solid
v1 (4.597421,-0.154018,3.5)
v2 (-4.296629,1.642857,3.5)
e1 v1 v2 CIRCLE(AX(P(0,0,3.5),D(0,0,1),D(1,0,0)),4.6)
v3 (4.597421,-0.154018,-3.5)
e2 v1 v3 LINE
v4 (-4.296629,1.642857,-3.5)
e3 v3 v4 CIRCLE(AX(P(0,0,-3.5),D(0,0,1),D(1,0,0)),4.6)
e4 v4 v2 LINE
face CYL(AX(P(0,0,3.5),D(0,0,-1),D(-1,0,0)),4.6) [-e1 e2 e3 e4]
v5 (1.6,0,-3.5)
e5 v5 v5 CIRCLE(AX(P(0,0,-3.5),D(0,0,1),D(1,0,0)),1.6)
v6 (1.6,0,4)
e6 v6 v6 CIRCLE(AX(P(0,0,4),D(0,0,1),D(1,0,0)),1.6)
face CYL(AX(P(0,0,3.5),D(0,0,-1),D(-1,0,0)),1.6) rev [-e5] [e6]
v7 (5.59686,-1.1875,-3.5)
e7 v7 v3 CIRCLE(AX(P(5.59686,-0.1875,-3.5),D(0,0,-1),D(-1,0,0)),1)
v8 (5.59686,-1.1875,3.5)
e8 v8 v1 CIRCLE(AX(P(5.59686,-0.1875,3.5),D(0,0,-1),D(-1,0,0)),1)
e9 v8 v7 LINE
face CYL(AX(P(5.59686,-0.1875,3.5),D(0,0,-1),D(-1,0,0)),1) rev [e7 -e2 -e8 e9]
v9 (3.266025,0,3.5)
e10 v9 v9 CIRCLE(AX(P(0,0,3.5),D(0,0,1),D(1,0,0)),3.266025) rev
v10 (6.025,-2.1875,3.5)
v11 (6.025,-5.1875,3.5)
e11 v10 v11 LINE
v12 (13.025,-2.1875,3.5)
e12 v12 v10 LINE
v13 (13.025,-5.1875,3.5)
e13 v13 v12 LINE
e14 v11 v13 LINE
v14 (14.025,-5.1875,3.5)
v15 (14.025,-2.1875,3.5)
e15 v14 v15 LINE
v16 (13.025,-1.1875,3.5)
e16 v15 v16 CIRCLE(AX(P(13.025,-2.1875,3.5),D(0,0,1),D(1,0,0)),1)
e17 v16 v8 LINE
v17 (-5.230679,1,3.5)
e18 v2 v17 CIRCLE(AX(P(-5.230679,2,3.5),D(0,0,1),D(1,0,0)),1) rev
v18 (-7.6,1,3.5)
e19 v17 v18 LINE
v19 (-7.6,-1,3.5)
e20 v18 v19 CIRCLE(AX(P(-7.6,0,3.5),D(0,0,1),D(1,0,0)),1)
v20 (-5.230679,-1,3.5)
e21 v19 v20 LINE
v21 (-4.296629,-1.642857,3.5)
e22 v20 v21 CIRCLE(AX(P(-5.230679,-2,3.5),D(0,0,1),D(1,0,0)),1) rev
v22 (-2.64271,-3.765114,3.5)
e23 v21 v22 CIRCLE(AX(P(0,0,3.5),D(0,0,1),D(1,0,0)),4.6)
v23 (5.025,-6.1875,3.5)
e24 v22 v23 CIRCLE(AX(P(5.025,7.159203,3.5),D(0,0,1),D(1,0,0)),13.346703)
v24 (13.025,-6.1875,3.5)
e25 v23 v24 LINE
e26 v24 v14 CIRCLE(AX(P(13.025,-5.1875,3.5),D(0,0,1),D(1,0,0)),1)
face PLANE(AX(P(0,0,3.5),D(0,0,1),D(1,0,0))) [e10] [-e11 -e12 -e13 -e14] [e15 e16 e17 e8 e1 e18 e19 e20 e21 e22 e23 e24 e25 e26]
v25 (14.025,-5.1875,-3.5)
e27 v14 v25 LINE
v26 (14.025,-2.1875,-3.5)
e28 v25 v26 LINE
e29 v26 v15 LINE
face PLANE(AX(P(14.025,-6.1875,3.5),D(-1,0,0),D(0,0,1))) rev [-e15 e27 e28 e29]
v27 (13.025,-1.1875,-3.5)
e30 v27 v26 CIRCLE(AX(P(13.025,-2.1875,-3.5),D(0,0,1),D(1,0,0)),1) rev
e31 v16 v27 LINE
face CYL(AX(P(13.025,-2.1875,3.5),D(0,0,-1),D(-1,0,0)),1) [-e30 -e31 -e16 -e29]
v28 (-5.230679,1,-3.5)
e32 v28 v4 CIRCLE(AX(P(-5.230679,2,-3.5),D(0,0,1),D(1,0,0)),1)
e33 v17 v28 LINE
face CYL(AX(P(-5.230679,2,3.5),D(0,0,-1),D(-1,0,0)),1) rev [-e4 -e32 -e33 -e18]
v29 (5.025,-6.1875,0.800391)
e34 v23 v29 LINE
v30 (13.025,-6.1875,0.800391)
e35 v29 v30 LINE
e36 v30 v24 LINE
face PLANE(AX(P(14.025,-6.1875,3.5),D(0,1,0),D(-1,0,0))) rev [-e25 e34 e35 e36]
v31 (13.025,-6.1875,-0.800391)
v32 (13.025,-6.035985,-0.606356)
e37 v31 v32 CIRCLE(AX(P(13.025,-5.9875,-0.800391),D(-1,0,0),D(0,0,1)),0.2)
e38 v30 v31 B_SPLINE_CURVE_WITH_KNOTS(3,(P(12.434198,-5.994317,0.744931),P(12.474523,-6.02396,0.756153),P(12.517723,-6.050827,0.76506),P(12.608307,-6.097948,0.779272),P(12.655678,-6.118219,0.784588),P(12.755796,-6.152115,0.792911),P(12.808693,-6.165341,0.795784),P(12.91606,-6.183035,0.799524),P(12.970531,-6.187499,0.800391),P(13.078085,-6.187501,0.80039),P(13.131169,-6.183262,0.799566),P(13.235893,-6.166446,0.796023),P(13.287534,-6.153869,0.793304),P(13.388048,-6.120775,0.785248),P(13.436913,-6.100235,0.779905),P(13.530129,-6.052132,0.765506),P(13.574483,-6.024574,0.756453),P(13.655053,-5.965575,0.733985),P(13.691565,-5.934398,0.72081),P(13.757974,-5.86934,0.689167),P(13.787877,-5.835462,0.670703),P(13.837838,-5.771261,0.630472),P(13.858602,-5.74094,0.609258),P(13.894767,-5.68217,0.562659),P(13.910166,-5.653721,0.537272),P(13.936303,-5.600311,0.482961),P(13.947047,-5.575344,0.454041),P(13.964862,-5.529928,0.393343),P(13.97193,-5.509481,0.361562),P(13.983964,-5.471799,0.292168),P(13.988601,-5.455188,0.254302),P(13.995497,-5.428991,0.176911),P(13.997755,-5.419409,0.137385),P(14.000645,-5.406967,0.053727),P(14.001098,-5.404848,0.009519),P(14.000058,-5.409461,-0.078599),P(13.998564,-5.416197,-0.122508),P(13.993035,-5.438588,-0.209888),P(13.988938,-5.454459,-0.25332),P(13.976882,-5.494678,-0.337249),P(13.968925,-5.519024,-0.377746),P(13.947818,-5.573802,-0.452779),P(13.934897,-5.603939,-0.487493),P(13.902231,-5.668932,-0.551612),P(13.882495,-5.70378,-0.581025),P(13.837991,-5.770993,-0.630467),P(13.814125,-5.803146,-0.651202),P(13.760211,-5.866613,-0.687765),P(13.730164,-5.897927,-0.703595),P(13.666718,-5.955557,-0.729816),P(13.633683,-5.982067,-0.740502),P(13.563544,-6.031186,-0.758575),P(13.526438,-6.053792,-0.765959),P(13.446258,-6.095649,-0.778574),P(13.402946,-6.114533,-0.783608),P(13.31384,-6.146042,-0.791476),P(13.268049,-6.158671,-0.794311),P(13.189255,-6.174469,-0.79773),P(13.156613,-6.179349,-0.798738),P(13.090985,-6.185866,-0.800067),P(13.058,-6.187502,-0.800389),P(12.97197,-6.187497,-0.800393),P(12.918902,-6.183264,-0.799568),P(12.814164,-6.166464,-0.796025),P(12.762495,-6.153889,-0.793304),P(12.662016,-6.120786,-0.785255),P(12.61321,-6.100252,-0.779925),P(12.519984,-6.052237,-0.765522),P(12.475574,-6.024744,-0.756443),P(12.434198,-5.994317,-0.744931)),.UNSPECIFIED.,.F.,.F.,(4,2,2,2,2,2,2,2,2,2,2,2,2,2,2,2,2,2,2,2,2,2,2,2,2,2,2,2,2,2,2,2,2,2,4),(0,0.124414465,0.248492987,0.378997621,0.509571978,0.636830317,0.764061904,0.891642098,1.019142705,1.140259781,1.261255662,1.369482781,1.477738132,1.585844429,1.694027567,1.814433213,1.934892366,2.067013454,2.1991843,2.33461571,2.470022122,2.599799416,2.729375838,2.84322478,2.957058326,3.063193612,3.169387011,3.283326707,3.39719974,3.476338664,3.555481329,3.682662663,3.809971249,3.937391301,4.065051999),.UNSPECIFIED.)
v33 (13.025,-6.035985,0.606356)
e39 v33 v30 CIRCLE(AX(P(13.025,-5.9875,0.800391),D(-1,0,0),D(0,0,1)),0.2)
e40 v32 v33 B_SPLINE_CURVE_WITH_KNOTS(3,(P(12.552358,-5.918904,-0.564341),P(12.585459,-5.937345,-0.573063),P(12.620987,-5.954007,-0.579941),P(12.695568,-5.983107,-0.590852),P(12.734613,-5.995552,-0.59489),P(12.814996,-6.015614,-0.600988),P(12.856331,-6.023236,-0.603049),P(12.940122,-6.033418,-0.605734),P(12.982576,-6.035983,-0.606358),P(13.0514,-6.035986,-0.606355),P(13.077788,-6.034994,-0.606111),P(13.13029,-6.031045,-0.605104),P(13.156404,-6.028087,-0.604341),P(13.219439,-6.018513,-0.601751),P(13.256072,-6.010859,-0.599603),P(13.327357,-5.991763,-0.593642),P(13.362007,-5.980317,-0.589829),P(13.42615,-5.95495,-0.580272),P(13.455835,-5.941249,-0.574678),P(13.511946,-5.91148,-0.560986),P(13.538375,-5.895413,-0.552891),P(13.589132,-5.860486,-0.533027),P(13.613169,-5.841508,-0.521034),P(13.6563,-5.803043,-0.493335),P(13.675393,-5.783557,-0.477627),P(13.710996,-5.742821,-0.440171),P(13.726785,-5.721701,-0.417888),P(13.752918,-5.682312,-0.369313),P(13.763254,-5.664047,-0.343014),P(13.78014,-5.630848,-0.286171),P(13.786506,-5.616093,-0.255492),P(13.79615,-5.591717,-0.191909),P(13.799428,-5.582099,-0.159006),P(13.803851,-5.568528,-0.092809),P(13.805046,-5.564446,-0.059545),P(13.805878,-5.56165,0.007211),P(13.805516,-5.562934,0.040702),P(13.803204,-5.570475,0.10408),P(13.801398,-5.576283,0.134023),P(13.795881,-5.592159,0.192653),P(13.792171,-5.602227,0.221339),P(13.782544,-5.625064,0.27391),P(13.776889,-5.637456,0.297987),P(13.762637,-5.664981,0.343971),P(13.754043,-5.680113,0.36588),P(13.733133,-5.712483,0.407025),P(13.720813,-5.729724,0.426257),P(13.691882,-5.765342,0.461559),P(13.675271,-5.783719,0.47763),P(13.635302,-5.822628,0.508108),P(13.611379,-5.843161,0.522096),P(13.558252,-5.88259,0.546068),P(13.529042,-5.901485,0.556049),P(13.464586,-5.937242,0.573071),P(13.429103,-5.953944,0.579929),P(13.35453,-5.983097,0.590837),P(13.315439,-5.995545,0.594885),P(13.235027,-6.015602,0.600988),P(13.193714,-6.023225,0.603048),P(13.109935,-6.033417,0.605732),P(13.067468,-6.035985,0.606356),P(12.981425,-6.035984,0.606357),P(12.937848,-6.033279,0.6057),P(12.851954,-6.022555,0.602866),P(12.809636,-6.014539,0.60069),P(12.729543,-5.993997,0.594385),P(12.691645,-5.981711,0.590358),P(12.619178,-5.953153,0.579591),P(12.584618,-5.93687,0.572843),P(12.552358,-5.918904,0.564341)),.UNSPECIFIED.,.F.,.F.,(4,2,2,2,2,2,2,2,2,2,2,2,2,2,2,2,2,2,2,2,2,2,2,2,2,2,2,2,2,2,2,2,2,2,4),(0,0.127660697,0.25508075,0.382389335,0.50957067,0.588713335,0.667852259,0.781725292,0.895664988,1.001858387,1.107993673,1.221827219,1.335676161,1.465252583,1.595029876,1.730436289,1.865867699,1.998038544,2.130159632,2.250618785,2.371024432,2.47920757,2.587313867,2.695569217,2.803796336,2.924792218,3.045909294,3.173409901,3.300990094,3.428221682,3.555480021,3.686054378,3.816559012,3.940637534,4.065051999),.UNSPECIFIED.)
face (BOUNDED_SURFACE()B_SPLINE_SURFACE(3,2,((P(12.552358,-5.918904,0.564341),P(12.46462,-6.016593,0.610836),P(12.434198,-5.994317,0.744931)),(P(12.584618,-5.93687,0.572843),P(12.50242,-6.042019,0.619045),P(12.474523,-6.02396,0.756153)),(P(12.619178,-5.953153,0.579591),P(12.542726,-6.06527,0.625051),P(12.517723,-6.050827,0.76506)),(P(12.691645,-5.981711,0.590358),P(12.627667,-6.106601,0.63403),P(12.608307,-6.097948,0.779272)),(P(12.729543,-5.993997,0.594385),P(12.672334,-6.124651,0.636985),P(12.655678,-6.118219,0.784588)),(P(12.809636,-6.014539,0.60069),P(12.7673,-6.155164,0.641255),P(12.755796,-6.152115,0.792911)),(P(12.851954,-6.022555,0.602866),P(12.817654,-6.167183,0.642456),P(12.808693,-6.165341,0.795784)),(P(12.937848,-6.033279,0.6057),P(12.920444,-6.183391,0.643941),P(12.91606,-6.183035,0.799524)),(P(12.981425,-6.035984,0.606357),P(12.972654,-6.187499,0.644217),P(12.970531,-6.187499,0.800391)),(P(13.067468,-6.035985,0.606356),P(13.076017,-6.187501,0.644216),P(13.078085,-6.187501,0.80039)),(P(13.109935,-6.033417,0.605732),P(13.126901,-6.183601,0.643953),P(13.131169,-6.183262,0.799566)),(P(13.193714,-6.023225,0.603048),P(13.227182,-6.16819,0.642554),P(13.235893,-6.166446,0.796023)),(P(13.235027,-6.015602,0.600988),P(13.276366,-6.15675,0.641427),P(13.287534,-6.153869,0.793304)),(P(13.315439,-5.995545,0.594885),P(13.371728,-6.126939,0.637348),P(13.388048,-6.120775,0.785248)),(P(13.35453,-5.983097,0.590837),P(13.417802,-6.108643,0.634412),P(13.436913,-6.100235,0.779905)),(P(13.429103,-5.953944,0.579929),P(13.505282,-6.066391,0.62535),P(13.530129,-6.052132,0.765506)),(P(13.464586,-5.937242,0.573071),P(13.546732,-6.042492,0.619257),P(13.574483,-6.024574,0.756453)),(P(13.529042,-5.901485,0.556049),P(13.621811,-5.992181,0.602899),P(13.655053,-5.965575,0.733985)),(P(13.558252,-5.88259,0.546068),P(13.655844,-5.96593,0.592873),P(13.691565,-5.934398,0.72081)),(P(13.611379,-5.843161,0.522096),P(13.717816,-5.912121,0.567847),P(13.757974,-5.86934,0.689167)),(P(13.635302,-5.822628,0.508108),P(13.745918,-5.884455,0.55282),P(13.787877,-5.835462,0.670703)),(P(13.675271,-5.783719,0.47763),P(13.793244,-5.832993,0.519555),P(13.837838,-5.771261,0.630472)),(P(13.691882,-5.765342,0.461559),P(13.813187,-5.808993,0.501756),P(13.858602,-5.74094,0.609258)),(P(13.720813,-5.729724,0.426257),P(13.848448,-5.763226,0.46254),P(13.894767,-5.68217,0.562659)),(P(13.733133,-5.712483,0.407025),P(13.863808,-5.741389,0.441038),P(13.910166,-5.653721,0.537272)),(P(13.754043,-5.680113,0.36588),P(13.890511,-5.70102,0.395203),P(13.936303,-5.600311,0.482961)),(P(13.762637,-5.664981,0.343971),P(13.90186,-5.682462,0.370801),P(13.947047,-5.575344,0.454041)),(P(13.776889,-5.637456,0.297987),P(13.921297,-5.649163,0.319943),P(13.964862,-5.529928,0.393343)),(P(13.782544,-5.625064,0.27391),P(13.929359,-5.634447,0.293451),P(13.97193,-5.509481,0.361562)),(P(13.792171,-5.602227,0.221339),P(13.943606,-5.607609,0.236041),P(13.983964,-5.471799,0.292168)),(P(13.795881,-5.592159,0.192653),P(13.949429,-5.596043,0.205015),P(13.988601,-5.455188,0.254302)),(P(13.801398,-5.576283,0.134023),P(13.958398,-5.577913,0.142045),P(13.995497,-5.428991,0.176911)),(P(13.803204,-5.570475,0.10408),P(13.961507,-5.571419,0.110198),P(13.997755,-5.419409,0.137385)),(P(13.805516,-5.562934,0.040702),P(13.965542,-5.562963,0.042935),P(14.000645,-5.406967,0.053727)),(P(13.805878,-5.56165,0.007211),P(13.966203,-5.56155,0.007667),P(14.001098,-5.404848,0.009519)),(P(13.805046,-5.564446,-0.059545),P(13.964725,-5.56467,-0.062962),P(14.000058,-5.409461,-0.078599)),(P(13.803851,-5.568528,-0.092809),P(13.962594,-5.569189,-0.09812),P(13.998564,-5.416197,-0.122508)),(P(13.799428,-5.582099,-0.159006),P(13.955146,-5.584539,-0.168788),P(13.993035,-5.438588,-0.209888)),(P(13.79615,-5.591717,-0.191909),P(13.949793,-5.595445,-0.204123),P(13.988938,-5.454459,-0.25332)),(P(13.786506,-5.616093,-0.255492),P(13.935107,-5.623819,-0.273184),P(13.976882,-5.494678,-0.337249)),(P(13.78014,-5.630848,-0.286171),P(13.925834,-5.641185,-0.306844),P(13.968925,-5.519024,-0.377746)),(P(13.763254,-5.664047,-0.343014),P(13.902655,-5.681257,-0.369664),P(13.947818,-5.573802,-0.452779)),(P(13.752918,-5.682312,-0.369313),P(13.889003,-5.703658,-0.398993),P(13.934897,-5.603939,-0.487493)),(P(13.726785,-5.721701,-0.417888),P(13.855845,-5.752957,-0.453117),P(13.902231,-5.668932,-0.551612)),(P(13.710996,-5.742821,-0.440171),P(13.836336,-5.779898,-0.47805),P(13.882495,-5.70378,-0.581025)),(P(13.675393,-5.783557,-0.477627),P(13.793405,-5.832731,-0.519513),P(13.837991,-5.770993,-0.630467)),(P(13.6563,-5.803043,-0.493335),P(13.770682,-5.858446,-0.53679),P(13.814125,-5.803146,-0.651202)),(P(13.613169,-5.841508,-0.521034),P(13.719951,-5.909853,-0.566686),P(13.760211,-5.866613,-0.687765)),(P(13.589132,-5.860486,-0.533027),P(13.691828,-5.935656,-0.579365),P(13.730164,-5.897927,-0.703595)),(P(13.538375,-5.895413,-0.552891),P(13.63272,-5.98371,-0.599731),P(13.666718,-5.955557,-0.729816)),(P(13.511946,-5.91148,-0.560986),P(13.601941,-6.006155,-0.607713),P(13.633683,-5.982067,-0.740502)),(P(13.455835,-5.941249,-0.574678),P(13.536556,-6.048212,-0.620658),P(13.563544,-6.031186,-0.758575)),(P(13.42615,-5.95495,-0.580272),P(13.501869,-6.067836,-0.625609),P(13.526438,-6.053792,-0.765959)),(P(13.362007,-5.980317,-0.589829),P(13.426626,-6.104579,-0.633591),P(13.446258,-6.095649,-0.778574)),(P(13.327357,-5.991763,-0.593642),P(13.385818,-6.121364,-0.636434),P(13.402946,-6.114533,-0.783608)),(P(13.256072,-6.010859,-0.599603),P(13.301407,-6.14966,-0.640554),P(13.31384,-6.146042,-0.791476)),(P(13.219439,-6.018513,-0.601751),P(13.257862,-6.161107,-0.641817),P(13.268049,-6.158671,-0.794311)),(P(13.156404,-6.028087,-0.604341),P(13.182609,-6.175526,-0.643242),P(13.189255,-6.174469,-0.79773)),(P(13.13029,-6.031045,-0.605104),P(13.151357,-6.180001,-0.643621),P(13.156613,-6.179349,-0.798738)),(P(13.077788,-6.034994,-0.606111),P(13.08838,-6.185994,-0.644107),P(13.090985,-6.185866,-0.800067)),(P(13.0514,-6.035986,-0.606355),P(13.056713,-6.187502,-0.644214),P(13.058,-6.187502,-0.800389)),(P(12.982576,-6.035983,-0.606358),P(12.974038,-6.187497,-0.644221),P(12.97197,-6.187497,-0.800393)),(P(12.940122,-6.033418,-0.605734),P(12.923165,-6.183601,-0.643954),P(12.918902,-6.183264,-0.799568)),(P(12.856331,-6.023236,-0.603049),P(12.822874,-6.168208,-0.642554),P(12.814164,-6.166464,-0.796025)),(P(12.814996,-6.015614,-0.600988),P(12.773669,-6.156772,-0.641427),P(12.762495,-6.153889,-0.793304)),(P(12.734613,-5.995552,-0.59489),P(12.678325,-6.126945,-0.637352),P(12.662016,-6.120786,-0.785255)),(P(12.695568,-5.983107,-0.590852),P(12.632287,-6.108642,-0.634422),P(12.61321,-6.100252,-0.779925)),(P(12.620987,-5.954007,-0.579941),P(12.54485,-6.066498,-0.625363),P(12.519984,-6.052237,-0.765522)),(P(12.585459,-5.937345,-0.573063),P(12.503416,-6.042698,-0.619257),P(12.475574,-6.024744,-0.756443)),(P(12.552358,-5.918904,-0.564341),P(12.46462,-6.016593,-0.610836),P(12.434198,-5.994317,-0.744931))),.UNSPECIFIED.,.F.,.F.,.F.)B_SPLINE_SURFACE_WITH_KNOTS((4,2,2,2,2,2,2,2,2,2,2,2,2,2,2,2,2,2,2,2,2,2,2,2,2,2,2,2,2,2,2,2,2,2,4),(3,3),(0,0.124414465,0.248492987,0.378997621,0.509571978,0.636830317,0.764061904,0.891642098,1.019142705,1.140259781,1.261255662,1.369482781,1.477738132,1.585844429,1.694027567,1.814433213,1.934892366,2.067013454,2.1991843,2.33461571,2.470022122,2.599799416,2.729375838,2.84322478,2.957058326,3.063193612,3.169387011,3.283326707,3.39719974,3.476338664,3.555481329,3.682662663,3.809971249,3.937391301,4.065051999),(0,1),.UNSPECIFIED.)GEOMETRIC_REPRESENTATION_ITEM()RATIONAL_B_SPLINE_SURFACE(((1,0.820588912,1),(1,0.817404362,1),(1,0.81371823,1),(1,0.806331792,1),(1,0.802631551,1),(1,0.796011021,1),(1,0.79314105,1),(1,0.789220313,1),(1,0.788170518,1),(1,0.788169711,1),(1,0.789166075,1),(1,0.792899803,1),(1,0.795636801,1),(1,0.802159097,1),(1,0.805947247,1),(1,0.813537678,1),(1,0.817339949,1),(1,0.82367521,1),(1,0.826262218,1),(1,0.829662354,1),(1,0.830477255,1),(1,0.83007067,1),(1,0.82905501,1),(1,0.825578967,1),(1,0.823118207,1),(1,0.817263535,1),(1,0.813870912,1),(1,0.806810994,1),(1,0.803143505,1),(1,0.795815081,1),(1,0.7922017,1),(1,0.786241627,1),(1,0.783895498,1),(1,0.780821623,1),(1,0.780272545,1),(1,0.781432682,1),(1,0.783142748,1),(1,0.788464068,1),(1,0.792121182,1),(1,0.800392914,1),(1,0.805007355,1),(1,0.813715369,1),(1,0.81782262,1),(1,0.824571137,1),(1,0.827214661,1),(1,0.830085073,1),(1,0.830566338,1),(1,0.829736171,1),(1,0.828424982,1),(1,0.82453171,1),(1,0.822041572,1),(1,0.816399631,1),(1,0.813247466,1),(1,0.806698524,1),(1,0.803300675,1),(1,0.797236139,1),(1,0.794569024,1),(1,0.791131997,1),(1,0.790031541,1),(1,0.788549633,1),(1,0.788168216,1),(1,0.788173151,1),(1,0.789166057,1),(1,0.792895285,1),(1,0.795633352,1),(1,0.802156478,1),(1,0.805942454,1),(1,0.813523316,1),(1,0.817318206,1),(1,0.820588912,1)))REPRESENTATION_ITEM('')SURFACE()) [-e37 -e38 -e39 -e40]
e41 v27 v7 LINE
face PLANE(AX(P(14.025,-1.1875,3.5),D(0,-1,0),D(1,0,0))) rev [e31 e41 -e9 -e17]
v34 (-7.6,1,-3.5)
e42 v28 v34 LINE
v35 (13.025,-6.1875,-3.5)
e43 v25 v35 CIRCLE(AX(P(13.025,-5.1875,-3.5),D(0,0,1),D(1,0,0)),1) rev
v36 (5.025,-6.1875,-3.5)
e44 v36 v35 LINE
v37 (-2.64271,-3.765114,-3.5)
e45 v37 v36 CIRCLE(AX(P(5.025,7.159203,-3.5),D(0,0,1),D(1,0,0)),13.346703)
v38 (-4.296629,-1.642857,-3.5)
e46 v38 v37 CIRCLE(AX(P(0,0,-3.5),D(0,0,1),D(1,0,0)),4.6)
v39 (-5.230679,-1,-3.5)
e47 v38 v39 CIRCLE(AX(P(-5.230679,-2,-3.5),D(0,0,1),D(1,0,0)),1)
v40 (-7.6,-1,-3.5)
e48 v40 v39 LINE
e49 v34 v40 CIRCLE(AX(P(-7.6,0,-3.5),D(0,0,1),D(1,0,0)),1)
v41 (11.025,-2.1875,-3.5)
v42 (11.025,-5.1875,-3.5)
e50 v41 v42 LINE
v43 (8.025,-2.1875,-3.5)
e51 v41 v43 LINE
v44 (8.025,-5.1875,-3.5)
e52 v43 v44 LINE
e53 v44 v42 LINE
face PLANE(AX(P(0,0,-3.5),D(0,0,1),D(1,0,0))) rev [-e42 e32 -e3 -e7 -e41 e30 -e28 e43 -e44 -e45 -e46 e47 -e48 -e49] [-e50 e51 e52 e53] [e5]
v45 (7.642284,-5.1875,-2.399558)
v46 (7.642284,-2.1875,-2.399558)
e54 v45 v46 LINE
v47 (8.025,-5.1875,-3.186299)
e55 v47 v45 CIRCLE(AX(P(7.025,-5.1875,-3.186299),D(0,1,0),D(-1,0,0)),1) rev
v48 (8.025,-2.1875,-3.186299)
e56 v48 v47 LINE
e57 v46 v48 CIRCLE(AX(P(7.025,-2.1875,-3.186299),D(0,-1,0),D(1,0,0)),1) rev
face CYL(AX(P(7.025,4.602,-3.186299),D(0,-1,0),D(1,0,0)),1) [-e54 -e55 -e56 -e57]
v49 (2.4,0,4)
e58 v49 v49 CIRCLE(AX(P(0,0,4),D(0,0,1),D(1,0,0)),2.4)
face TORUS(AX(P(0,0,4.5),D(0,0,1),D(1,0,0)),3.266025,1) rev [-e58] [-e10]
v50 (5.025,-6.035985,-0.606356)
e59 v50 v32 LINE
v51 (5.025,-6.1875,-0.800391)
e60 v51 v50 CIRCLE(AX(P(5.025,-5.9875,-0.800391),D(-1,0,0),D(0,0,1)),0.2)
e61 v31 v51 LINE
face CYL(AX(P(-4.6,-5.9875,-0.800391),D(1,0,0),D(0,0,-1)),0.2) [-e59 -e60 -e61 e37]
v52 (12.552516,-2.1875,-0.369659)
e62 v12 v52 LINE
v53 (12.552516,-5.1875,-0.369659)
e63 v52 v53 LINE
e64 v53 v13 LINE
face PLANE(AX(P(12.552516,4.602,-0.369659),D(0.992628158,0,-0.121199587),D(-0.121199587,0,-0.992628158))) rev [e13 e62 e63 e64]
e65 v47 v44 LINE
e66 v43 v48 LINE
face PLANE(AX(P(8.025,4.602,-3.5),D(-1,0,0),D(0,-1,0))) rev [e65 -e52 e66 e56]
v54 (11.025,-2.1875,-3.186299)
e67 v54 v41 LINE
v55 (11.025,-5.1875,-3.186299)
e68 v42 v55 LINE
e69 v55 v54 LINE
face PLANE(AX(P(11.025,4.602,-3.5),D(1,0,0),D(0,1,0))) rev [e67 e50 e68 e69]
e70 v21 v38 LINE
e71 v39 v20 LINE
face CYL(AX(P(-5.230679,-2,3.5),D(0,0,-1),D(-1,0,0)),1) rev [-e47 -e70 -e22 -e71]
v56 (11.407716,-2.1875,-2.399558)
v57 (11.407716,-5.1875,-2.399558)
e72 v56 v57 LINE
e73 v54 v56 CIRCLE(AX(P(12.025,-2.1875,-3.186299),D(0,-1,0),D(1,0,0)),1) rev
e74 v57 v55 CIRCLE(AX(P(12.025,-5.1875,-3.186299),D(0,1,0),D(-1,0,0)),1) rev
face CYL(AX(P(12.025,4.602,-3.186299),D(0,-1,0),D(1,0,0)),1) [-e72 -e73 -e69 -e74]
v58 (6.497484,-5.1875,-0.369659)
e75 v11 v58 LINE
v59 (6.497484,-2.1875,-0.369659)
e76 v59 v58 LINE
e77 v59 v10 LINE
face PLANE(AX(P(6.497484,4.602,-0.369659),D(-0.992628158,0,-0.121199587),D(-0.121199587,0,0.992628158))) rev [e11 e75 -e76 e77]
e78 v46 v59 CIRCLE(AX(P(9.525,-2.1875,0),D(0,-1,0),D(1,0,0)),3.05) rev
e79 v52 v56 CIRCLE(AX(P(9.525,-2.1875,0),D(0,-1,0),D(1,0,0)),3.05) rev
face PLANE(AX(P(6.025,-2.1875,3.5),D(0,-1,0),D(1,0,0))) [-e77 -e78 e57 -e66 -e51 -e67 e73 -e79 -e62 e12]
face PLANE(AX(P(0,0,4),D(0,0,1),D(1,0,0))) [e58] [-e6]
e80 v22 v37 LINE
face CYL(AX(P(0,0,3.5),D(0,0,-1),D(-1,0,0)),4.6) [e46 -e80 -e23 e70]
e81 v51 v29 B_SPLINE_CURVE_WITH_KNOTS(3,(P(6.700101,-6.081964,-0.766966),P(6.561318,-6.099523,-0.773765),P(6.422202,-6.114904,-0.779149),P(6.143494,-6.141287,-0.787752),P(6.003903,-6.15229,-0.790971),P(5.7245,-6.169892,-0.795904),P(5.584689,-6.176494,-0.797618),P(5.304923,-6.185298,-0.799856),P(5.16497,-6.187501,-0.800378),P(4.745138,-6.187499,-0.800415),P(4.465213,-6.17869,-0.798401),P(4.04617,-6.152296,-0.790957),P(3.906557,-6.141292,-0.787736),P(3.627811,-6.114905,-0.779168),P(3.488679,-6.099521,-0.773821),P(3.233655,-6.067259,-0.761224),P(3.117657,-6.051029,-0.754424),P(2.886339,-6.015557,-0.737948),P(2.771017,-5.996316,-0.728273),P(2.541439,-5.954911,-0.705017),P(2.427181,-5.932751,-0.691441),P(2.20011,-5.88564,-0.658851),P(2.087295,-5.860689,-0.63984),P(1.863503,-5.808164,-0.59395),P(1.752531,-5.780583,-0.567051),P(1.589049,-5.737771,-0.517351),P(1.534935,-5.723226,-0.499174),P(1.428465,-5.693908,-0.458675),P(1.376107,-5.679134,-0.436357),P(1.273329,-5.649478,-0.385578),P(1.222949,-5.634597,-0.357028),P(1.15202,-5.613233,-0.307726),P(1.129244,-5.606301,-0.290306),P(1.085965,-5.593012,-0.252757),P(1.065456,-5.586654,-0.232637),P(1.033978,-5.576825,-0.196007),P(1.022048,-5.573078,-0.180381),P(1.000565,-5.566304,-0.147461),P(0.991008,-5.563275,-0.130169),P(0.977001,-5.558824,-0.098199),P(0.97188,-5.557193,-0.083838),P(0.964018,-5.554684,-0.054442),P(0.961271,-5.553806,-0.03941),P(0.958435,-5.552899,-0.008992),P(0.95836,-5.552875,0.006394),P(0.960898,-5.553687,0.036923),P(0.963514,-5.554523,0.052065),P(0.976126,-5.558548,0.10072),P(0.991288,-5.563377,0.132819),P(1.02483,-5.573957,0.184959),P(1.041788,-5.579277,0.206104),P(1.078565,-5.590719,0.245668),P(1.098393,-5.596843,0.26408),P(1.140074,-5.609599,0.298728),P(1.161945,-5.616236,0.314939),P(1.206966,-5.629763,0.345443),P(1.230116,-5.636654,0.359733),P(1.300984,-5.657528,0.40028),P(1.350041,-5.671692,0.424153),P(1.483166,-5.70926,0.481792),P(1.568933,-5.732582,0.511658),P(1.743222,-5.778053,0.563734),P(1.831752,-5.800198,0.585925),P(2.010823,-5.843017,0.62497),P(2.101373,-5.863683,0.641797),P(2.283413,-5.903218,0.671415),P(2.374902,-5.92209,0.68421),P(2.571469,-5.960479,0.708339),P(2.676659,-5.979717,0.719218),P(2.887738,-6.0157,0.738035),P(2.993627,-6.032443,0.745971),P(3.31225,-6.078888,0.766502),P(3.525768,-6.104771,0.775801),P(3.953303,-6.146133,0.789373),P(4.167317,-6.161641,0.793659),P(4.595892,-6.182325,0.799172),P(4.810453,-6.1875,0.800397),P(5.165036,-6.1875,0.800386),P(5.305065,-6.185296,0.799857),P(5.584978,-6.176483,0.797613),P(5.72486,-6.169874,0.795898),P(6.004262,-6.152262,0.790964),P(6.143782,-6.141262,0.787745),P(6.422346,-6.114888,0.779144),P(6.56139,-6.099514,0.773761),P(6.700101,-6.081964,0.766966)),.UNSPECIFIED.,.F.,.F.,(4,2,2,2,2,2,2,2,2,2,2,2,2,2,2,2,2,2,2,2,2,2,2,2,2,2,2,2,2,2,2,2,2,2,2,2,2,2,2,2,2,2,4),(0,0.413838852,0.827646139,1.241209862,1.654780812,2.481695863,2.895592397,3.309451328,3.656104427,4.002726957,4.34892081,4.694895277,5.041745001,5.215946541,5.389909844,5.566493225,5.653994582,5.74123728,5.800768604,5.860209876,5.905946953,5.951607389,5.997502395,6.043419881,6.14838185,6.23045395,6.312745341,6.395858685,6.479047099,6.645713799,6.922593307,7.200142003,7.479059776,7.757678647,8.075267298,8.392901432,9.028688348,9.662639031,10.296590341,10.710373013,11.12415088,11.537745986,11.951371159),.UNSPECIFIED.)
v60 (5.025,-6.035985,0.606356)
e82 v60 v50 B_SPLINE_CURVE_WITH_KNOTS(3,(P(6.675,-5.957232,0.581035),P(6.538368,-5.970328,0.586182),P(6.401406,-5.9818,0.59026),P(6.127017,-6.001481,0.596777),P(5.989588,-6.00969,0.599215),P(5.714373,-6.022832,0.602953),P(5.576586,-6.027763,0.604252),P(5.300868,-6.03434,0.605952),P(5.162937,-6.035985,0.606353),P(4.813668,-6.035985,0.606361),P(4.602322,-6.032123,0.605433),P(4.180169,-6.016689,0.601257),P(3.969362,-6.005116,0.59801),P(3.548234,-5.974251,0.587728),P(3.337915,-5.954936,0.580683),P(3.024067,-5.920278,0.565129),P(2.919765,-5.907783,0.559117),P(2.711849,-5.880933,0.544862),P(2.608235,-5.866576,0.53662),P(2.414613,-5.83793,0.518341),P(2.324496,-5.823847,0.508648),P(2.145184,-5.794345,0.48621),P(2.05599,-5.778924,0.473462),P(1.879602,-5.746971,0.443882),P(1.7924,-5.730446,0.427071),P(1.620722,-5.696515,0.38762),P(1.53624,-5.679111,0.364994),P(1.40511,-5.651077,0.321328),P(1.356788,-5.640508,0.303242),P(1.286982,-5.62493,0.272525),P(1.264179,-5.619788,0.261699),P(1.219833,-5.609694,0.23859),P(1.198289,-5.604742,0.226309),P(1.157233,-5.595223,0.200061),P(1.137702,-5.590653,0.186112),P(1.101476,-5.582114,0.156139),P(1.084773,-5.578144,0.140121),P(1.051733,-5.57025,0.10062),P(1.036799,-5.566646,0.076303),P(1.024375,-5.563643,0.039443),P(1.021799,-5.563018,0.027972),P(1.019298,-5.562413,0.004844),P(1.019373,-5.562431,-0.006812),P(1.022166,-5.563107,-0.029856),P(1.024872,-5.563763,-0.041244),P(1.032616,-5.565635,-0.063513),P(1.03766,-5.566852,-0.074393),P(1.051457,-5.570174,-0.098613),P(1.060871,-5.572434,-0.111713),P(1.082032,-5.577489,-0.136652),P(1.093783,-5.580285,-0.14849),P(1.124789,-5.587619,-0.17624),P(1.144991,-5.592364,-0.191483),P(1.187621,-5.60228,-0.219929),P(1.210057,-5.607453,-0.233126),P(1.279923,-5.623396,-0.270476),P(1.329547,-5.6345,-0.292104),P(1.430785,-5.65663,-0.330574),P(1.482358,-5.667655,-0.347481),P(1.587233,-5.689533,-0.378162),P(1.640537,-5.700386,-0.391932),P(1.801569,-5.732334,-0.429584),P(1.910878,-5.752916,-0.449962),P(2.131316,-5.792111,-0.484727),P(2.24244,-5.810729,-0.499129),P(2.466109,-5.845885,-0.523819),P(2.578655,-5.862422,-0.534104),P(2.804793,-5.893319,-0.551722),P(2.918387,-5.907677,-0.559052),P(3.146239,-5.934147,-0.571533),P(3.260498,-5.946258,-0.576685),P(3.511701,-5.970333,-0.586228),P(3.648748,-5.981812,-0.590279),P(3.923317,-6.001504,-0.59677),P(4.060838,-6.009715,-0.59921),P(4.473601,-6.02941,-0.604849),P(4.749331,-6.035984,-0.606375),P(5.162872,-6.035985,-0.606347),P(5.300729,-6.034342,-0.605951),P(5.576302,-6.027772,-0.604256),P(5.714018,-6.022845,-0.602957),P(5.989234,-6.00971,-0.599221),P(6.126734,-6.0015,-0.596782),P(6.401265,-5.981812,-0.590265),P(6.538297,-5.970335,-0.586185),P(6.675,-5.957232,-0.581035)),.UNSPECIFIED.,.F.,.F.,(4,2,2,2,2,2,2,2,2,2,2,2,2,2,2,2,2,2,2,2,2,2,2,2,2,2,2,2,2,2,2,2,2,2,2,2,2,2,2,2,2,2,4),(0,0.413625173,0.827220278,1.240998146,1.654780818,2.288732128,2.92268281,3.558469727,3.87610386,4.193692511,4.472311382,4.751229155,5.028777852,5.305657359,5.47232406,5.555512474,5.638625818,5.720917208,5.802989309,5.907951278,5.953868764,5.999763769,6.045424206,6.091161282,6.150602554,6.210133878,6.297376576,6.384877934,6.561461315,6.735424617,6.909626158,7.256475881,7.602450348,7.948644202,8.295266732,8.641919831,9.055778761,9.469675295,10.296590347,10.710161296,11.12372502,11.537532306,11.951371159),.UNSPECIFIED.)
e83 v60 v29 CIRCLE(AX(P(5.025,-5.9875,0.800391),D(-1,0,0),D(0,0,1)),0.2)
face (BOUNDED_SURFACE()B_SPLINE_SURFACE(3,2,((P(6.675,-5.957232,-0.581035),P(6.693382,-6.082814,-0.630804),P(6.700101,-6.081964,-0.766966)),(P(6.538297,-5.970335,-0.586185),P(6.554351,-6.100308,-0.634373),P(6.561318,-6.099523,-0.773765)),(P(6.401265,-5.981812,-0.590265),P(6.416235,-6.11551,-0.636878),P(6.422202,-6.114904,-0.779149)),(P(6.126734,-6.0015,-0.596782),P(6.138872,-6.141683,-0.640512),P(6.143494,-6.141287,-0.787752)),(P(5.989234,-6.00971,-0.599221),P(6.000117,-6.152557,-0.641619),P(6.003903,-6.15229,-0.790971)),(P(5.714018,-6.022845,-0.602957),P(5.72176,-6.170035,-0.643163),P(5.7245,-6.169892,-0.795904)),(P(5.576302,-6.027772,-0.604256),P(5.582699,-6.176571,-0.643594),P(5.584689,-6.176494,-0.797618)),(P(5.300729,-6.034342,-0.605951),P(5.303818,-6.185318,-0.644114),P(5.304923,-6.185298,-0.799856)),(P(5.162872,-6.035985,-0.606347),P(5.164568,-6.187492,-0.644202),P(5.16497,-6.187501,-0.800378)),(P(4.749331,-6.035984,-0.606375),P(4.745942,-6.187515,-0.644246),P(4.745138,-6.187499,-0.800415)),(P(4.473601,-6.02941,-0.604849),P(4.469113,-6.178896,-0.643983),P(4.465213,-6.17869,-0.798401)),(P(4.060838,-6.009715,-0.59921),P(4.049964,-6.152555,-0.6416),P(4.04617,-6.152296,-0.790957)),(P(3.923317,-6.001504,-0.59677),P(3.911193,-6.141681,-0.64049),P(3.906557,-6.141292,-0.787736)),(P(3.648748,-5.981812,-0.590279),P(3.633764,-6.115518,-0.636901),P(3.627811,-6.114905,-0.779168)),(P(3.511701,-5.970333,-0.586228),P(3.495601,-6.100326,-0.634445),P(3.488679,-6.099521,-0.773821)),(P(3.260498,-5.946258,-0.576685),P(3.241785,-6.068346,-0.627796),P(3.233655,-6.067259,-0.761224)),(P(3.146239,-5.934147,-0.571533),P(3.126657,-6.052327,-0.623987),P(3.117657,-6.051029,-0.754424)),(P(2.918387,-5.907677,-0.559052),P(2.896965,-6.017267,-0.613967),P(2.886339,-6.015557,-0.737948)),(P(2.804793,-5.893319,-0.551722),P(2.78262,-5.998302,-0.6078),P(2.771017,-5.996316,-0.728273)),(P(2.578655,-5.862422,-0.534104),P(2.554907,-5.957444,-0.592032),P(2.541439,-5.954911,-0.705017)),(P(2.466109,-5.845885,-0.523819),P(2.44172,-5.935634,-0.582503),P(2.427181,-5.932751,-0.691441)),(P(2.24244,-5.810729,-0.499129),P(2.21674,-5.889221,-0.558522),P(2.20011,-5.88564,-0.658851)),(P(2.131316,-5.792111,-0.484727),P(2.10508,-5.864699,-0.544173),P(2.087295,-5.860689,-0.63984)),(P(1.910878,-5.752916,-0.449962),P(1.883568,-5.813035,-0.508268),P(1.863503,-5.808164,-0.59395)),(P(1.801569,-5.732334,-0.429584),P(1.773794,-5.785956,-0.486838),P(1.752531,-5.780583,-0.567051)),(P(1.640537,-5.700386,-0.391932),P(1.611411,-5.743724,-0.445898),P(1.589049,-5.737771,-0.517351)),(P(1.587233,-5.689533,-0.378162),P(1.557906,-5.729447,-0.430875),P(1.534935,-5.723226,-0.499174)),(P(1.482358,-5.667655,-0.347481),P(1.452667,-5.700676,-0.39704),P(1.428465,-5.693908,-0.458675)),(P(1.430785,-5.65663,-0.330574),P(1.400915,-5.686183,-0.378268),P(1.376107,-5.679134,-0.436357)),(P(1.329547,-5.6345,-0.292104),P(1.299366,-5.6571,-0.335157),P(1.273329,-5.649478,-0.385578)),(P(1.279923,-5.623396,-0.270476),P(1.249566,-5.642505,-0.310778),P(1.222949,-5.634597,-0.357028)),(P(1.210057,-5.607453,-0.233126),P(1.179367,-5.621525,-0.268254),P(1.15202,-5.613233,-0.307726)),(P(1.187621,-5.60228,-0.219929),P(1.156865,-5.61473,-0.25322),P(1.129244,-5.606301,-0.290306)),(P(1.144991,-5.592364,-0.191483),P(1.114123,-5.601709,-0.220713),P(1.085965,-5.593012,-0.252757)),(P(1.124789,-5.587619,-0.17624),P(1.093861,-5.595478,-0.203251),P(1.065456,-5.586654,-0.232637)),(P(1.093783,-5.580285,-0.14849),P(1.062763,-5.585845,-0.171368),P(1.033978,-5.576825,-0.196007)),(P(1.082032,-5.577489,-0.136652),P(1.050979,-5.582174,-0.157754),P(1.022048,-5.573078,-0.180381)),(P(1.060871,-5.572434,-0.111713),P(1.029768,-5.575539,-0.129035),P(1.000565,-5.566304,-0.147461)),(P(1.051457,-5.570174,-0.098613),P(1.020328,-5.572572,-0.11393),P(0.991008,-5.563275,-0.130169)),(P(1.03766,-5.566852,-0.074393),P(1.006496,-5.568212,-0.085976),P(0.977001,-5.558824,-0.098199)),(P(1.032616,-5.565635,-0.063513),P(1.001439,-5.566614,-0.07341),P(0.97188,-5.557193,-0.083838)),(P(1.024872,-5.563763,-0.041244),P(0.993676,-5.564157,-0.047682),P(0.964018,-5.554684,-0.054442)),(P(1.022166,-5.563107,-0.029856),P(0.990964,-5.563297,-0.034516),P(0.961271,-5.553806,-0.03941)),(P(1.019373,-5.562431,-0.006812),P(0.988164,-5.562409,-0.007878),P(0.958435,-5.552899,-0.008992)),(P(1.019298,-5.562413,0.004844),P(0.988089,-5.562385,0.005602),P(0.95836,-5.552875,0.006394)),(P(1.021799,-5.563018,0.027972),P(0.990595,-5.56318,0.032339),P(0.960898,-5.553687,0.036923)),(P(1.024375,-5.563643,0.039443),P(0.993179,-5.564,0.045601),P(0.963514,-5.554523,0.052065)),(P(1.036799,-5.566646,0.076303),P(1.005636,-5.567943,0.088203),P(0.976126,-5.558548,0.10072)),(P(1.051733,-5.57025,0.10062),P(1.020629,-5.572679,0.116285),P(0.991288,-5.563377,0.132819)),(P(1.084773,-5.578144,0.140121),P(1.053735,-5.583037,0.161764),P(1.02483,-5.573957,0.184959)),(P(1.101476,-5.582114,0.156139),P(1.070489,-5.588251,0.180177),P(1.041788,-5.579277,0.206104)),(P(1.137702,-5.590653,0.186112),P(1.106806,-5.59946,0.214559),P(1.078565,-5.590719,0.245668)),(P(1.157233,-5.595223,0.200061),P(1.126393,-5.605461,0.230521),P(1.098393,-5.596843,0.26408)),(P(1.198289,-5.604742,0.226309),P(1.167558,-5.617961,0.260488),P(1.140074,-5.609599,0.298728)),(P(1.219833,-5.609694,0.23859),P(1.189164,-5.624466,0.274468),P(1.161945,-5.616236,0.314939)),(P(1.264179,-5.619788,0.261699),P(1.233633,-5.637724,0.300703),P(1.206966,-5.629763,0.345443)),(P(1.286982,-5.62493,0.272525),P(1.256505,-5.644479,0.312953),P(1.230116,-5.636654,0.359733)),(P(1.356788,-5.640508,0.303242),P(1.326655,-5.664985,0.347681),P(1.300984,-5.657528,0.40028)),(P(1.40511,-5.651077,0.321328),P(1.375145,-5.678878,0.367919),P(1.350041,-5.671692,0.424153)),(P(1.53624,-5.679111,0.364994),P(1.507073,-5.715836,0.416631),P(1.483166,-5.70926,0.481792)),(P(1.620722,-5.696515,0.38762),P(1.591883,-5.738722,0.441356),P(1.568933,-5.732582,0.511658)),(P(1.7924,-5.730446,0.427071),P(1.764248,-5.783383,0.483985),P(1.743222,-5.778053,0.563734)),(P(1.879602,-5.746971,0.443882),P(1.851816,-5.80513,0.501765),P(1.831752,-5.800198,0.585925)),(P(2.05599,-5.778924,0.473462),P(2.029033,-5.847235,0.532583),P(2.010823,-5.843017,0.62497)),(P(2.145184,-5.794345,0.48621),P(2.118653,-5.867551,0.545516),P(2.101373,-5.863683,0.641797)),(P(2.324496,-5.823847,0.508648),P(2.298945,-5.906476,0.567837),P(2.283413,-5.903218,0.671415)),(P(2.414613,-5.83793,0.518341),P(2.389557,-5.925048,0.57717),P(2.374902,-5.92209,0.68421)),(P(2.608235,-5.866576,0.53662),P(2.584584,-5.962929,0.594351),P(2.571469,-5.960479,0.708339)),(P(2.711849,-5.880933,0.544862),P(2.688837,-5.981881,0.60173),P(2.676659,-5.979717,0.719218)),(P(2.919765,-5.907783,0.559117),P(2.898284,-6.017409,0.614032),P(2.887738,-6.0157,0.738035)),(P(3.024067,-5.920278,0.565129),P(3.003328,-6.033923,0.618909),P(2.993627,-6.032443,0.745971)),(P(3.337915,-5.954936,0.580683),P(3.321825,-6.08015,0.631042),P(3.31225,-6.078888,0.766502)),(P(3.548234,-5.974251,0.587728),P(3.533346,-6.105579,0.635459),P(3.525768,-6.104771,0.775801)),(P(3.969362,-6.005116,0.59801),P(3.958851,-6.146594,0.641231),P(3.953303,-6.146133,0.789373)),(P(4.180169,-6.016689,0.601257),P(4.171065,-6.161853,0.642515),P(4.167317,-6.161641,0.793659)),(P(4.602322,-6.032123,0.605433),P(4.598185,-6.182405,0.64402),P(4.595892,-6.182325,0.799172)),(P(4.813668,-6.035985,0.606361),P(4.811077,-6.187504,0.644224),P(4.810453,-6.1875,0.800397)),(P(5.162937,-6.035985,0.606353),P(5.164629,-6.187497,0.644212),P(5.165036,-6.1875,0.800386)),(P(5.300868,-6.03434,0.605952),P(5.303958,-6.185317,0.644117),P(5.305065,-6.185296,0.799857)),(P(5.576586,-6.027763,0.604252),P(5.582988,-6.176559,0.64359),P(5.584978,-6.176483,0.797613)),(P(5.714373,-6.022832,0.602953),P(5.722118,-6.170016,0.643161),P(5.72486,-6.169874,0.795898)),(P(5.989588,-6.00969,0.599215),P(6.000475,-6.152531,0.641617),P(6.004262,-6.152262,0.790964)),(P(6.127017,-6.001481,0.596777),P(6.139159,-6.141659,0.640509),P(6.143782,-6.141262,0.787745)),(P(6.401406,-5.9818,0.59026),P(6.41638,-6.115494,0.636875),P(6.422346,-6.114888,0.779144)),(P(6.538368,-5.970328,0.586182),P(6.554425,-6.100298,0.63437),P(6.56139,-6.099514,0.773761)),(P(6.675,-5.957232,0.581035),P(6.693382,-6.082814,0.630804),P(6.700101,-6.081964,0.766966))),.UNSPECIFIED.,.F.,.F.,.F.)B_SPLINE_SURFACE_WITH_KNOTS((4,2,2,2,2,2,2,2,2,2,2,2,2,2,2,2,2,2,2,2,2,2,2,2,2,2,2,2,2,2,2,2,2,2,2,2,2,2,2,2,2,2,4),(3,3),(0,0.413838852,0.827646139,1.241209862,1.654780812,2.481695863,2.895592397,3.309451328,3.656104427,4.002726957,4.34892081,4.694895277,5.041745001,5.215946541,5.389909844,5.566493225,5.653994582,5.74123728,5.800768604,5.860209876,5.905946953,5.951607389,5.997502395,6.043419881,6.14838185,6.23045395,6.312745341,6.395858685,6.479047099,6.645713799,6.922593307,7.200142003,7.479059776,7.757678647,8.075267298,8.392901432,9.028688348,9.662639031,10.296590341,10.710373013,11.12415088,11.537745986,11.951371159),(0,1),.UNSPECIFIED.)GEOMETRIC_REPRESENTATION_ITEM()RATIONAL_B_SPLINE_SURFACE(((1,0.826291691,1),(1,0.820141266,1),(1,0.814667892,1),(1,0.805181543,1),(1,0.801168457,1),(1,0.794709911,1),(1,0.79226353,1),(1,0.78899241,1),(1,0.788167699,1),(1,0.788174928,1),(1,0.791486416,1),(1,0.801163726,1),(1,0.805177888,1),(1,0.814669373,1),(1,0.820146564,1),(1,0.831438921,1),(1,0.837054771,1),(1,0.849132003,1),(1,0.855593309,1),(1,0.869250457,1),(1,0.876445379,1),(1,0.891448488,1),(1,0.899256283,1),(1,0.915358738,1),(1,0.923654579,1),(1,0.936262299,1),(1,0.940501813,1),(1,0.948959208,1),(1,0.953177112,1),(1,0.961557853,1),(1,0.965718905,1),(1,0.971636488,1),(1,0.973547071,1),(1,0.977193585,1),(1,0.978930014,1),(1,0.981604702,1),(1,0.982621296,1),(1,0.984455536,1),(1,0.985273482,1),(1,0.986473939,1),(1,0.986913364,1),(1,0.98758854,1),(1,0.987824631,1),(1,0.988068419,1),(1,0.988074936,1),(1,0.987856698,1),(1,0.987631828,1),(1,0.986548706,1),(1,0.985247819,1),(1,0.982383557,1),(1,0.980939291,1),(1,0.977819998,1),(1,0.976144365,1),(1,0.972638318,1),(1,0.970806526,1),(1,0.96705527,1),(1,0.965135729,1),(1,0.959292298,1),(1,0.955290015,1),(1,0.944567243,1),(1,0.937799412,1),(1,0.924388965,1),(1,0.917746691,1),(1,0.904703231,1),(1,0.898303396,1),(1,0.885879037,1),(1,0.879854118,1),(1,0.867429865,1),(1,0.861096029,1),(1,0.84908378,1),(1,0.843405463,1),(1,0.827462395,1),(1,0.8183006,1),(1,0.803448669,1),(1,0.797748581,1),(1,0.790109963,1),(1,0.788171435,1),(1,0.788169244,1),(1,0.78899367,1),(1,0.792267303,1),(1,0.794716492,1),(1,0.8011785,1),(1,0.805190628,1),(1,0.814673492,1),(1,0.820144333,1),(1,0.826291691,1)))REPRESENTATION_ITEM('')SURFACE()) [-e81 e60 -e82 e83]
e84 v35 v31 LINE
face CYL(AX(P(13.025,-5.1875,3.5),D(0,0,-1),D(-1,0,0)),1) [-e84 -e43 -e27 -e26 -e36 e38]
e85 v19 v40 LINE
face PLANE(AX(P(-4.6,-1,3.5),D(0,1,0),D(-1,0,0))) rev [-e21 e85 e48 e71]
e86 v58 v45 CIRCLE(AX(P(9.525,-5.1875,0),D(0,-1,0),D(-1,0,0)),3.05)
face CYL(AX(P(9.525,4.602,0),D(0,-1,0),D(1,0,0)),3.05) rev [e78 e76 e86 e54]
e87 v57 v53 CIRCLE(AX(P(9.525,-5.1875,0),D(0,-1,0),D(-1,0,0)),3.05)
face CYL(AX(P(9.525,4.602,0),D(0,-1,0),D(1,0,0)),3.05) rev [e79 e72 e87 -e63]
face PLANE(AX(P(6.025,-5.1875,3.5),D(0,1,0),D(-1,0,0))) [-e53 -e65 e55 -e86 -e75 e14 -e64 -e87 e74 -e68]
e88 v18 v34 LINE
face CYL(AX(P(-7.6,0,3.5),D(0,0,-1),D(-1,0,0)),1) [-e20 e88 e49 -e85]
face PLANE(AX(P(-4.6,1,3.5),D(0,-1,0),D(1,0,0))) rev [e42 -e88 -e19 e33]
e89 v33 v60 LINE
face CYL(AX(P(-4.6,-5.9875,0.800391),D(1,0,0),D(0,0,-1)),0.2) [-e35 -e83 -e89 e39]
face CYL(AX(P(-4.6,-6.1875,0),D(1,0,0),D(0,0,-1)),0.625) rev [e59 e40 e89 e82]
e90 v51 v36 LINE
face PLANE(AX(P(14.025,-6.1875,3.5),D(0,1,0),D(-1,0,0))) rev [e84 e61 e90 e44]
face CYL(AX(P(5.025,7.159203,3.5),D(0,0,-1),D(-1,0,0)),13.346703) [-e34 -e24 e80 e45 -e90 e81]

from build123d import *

# Parameters (mm, degrees)
SKETCH1_R           = 4.6
SKETCH1_R_2         = 1.6
BOSS_EXTRUDE1_DEPTH = 3.499999985
SKETCH2_W           = 7
SKETCH2_H           = 3
BOSS_EXTRUDE2_DEPTH = 3.499999985
BOSS_EXTRUDE3_REACH = 19.457
FILLET5_R           = 1
SKETCH6_R           = 0.625
CUT_EXTRUDE1_DEPTH  = 20.935540653
FILLET1_R           = 0.2
BOSS_EXTRUDE4_DEPTH = 3.499999985
FILLET2_R           = 1
FILLET3_R           = 1
BOSS_EXTRUDE5_START = 3.5
SKETCH1_2_R         = 4.6
SKETCH1_2_R_2       = 1.6
BOSS_EXTRUDE5_DEPTH = 0.5
SKETCH9_OUTSIDE_W   = 29.857
SKETCH9_OUTSIDE_H   = 18.02
SKETCH9_OUTSIDE_R   = 2.4
CUT_EXTRUDE2_DEPTH  = 0.5
FILLET4_R           = 1


with BuildPart() as part:
    # Sketch1 → Boss-Extrude1 (new, symmetric)
    with BuildSketch(Plane.XY):
        Circle(SKETCH1_R)
        Circle(SKETCH1_R_2, mode=Mode.SUBTRACT)
    extrude(amount=BOSS_EXTRUDE1_DEPTH, both=True)

    # Sketch2 → Boss-Extrude2 (add, symmetric)
    with BuildSketch(Plane.XY):
        with BuildLine():
            Line((14.025, -6.1875), (5.025, -6.1875))
            ThreePointArc((5.025, -6.1875), (1.004374029, -5.567503073), (-2.642710133, -3.765113963))
            ThreePointArc((-2.642710133, -3.765113963), (2.053101866, -4.116402887), (4.597420853, -0.154017857))
            ThreePointArc((4.597420853, -0.154017857), (4.878013126, -0.882668274), (5.596860169, -1.1875))
            Line((5.596860169, -1.1875), (14.025, -1.1875))
            Line((14.025, -1.1875), (14.025, -6.1875))
        make_face()
        with Locations((9.525, -3.6875)):
            Rectangle(SKETCH2_W, SKETCH2_H, mode=Mode.SUBTRACT)
    extrude(amount=BOSS_EXTRUDE2_DEPTH, both=True)

    # Sketch3 → Boss-Extrude3 (add, up to next)
    with BuildSketch(Plane(origin=(0, -5.1875, 0), x_dir=(1, 0, 0), z_dir=(0, 1, 0)), mode=Mode.PRIVATE) as boss_extrude3_sk1:
        with BuildLine():
            Line((6.497484118, 0.369658741), (6.025, -3.499999985))
            Line((6.025, -3.499999985), (6.025, 3.499999985))
            Line((6.025, 3.499999985), (8.025, 3.499999985))
            Line((8.025, 3.499999985), (8.025, 2.655654345))
            ThreePointArc((8.025, 2.655654345), (6.989049687, 1.694537108), (6.497484118, 0.369658741))
        make_face()
    boss_extrude3_tool1 = extrude(boss_extrude3_sk1.sketch, amount=BOSS_EXTRUDE3_REACH, mode=Mode.PRIVATE) - part.part
    # Sketch3 → Boss-Extrude3 (add, up to next)
    with BuildSketch(Plane(origin=(0, -5.1875, 0), x_dir=(1, 0, 0), z_dir=(0, 1, 0)), mode=Mode.PRIVATE) as boss_extrude3_sk2:
        with BuildLine():
            Line((12.552515882, 0.369658741), (13.025, -3.499999985))
            Line((13.025, -3.499999985), (13.025, 3.499999985))
            Line((13.025, 3.499999985), (11.025, 3.499999985))
            Line((11.025, 3.499999985), (11.025, 2.655654345))
            ThreePointArc((11.025, 2.655654345), (12.060950313, 1.694537108), (12.552515882, 0.369658741))
        make_face()
    boss_extrude3_tool2 = extrude(boss_extrude3_sk2.sketch, amount=BOSS_EXTRUDE3_REACH, mode=Mode.PRIVATE) - part.part
    add(boss_extrude3_tool1.solids().sort_by_distance((6.671602, -5.1875, -1.728299))[0])
    add(boss_extrude3_tool2.solids().sort_by_distance((12.378398, -5.1875, -1.728299))[0])

    # Fillet5
    fillet5_edges = [part.edges().sort_by_distance(p)[0] for p in [
        (14.025, -6.1875, 0),
        (14.025, -1.1875, 0),
    ]]
    fillet(fillet5_edges, radius=FILLET5_R)

    # Sketch6 → Cut-Extrude1 (cut, through all)
    with BuildSketch(Plane(origin=(14.025, 0, 0), x_dir=(0, 0, -1), z_dir=(1, 0, 0))):
        with Locations((0, -6.1875)):
            Circle(SKETCH6_R)
    extrude(amount=-CUT_EXTRUDE1_DEPTH, mode=Mode.SUBTRACT)

    # Fillet1
    fillet1_edges = [part.edges().sort_by_distance(p)[0] for p in [
        (13.95202478, -5.562500075, 0.000306186),
        (9.025, -6.1875, -0.625),
        (0.988571933, -5.562500075, 0.000306187),
        (9.025, -6.1875, 0.625),
    ]]
    fillet(fillet1_edges, radius=FILLET1_R)

    # Sketch7 → Boss-Extrude4 (add, symmetric)
    with BuildSketch(Plane.XY):
        with BuildLine():
            Line((-4.6, -1), (-7.6, -1))
            ThreePointArc((-7.6, -1), (-8.6, 0), (-7.6, 1))
            Line((-7.6, 1), (-4.6, 1))
            ThreePointArc((-4.6, 1), (-3.6, 0), (-4.6, -1))
        make_face()
    extrude(amount=BOSS_EXTRUDE4_DEPTH, both=True)

    # Fillet2
    fillet2_edges = [part.edges().sort_by_distance(p)[0] for p in [
        (-4.491304348, 0.994075075, 0),
        (-4.491304348, -0.994075075, 0),
    ]]
    fillet(fillet2_edges, radius=FILLET2_R)

    # Fillet3
    fillet3_edges = [part.edges().sort_by_distance(p)[0] for p in [
        (11.025, -3.6875, -2.655654345),
        (8.025, -3.6875, -2.655654345),
    ]]
    fillet(fillet3_edges, radius=FILLET3_R)

    # Sketch1<2> → Boss-Extrude5 (add, symmetric)
    with BuildSketch(Plane.XY.offset(BOSS_EXTRUDE5_START)):
        with Locations(Location((0, 0, 0), (0, 0, 159.075167572))):
            Circle(SKETCH1_2_R)
        Circle(SKETCH1_2_R_2, mode=Mode.SUBTRACT)
    extrude(amount=BOSS_EXTRUDE5_DEPTH, both=True)

    # Sketch9 outside → Cut-Extrude2 (cut)
    with BuildSketch(Plane.XY.offset(3.999999985)):
        with Locations((2.7125, -0.794)):
            Rectangle(SKETCH9_OUTSIDE_W, SKETCH9_OUTSIDE_H)
        Circle(SKETCH9_OUTSIDE_R, mode=Mode.SUBTRACT)
    extrude(amount=-CUT_EXTRUDE2_DEPTH, mode=Mode.SUBTRACT)

    # Fillet4
    # the kernel refuses this fillet: 1 mm, written as the material it adds along each edge
    with BuildSketch(Plane(origin=(0, 0, 3.499999985), x_dir=(1, 0, 0), z_dir=(0, -1, 0))) as fillet4_piece_1:
        with BuildLine():
            CenterArc((3.266025404, 1), FILLET4_R, 210, 60)
            Line((2.4, 0.5), (2.382679492, 0.49))
            ThreePointArc((2.382679492, 0.49), (2.38, 0.25), (2.38, 0))
            Line((2.38, 0), (2.4, -0.02))
            Line((2.4, -0.02), (3.266025404, -0.02))
            Line((3.266025404, -0.02), (3.266025404, 0))
        make_face()
    revolve(axis=Axis((0, 0, 3.499999985), (0, 0, 1)))


solid = part.part
